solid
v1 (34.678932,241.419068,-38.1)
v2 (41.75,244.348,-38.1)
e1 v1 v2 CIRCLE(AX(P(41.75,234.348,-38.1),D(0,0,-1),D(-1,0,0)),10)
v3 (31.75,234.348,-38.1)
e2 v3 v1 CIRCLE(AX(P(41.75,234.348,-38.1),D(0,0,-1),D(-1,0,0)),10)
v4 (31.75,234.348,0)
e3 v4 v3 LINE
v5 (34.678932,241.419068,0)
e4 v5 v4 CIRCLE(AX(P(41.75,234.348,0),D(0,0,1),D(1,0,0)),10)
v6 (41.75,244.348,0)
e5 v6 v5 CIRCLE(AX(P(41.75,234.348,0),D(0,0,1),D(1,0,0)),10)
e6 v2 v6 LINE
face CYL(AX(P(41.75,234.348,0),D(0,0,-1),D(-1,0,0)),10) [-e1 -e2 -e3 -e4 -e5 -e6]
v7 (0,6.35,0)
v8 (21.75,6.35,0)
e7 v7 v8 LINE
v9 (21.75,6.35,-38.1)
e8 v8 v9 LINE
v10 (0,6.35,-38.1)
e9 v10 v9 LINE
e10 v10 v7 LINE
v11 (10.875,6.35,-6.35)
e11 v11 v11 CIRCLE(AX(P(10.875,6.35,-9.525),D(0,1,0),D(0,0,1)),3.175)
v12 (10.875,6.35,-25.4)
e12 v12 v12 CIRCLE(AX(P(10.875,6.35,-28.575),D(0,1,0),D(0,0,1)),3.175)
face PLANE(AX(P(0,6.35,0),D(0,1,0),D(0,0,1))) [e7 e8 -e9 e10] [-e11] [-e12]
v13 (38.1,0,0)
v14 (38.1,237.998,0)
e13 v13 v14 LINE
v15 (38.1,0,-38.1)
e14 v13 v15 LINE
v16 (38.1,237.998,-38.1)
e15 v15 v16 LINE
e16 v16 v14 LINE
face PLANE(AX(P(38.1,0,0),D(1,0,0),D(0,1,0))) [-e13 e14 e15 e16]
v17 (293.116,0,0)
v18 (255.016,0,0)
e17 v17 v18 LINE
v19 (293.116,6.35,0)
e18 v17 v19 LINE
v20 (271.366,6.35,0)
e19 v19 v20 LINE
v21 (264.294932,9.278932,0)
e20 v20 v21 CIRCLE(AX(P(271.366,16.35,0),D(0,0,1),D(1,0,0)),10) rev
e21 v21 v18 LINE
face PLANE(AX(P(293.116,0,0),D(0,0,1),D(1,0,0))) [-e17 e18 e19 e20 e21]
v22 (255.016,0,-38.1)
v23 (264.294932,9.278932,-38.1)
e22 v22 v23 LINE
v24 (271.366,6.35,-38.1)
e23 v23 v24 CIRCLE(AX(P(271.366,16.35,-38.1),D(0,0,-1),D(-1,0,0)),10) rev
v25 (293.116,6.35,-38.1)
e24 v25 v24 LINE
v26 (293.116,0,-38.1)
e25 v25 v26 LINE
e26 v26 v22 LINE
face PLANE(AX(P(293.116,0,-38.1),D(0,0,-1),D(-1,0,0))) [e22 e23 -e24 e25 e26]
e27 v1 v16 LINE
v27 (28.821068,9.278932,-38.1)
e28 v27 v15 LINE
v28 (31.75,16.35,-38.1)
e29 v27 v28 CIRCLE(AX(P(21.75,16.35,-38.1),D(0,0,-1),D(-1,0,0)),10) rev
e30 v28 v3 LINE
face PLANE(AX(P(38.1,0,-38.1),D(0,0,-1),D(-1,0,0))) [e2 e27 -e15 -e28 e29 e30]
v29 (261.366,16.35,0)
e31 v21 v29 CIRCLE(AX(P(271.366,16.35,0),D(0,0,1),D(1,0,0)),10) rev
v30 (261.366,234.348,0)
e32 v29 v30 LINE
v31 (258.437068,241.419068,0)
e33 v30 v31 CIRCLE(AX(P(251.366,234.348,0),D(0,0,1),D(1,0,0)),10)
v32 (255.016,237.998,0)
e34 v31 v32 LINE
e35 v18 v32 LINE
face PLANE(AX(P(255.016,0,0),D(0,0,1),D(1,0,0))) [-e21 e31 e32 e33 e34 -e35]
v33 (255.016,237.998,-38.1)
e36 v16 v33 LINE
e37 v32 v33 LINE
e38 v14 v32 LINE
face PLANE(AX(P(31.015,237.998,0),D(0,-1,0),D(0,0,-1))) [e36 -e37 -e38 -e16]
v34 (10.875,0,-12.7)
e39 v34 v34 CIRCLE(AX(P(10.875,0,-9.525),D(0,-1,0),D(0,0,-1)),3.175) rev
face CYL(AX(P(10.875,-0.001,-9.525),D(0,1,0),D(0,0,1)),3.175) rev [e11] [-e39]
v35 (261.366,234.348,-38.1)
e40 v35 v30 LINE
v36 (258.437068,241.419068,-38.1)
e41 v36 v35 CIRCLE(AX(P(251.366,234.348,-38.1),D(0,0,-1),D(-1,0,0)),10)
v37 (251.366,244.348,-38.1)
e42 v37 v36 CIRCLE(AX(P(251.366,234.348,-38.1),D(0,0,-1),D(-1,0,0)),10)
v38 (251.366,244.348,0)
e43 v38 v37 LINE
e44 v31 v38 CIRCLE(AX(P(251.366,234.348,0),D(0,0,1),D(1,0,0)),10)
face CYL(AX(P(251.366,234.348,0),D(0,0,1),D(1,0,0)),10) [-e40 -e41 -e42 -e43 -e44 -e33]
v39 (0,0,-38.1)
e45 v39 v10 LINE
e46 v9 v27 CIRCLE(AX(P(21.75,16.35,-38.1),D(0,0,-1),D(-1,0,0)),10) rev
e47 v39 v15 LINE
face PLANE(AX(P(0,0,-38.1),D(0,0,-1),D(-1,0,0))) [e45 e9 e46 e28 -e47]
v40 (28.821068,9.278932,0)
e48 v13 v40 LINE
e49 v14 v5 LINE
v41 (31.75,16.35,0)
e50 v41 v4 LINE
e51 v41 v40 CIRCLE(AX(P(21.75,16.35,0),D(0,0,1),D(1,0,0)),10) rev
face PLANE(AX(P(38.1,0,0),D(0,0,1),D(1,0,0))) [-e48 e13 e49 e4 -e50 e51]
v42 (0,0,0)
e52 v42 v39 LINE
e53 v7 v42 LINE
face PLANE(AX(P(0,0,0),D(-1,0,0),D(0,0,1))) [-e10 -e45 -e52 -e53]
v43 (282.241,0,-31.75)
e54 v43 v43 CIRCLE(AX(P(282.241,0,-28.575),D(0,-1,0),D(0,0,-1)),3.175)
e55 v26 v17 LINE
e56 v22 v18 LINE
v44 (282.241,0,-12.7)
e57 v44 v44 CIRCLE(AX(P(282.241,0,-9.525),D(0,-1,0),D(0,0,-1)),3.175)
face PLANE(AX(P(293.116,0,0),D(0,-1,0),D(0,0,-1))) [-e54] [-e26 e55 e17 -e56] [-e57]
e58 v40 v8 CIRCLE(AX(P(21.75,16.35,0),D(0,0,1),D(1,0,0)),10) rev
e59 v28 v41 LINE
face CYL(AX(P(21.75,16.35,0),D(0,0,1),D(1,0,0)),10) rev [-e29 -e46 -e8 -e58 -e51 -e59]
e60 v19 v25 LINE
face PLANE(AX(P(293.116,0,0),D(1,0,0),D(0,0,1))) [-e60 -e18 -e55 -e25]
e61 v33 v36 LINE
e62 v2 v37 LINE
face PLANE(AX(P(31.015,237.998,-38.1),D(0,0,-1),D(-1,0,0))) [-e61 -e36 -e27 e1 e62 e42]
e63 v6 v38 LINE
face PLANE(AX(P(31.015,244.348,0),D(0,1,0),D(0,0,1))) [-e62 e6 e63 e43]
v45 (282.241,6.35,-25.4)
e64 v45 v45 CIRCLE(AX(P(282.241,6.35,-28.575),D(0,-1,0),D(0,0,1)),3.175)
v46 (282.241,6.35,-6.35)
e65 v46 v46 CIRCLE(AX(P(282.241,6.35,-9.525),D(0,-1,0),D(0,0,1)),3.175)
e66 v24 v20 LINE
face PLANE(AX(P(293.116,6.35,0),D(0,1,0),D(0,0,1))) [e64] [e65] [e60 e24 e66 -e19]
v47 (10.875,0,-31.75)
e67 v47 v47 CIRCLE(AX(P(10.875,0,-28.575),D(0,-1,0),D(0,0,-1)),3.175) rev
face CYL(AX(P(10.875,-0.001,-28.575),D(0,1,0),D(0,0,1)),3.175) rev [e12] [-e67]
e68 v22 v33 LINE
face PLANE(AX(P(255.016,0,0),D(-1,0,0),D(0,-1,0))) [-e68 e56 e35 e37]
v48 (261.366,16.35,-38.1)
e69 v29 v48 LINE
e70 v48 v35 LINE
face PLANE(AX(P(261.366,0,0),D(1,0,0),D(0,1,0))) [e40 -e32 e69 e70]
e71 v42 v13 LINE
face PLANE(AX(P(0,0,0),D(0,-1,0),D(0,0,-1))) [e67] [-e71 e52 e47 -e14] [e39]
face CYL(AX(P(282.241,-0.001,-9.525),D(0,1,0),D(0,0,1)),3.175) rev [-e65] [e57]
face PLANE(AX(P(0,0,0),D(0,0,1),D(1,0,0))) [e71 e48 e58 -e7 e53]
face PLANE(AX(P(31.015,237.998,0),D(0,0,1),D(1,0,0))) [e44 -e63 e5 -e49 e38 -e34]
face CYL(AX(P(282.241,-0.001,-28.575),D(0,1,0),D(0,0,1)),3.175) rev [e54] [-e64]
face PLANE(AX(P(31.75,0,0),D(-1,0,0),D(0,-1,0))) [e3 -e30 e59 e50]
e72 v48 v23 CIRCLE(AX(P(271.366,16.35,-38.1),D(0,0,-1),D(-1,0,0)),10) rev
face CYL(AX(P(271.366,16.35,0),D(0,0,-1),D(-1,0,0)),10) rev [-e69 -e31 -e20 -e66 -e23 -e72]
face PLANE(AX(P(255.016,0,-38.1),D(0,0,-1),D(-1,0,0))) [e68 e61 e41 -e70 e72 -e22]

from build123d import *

# Parameters (mm, degrees)
SKETCH2_W            = 38.1
SKETCH2_H            = 6.35
FILLET1_R            = 10
CUT_EXTRUDE1_REACH   = 284.088
SKETCH3_R            = 3.175
FILLET1_OF_MIRROR1_R = 10


with BuildPart() as part:
    # Sweep1: sweep along a path in Sketch1
    with BuildLine(Plane.XY) as sweep1_path:
        Line((0, 0), (38.1, 0))
        Line((38.1, 0), (38.1, 237.998))
        Line((38.1, 237.998), (146.558, 237.998))
    # Sketch2 → Sweep1 (sweep)
    with BuildSketch(Plane(origin=(0, 0, 0), x_dir=(0, 0, -1), z_dir=(1, 0, 0))):
        with Locations((19.05, 3.175)):
            Rectangle(SKETCH2_W, SKETCH2_H)
    sweep1 = sweep(path=sweep1_path.line, transition=Transition.RIGHT)

    # Fillet1
    fillet1_edges = [part.edges().sort_by_distance(p)[0] for p in [
        (31.75, 6.35, -19.05),
        (31.75, 244.348, -19.05),
    ]]
    fillet(fillet1_edges, radius=FILLET1_R)

    # Sketch3 → Cut-Extrude1 (cut, up to next)
    with BuildSketch(Plane(origin=(0, 6.35, 0), x_dir=(1, 0, 0), z_dir=(0, 1, 0)), mode=Mode.PRIVATE) as cut_extrude1_sk1:
        with Locations((10.875, 28.575)):
            Circle(SKETCH3_R)
    cut_extrude1_tool1 = extrude(cut_extrude1_sk1.sketch, amount=-CUT_EXTRUDE1_REACH, mode=Mode.PRIVATE) & part.part
    # Sketch3 → Cut-Extrude1 (cut, up to next)
    with BuildSketch(Plane(origin=(0, 6.35, 0), x_dir=(1, 0, 0), z_dir=(0, 1, 0)), mode=Mode.PRIVATE) as cut_extrude1_sk2:
        with Locations((10.875, 9.525)):
            Circle(SKETCH3_R)
    cut_extrude1_tool2 = extrude(cut_extrude1_sk2.sketch, amount=-CUT_EXTRUDE1_REACH, mode=Mode.PRIVATE) & part.part
    cut_extrude1_1 = cut_extrude1_tool1.solids().sort_by_distance((10.875, 6.35, -28.575))[0]
    add(cut_extrude1_1, mode=Mode.SUBTRACT)
    cut_extrude1_2 = cut_extrude1_tool2.solids().sort_by_distance((10.875, 6.35, -9.525))[0]
    add(cut_extrude1_2, mode=Mode.SUBTRACT)
    cut_extrude1 = cut_extrude1_1 + cut_extrude1_2  # Cut-Extrude1 as one shape, for the pattern or mirror that repeats it

    # Mirror1: Sweep1, Cut-Extrude1 across plane
    add(sweep1.mirror(Plane(origin=(146.558, 237.998, 0), x_dir=(0, 0, 1), z_dir=(-1, 0, 0))))
    add(cut_extrude1.mirror(Plane(origin=(146.558, 237.998, 0), x_dir=(0, 0, 1), z_dir=(-1, 0, 0))), mode=Mode.SUBTRACT)

    # Fillet1 of Mirror1
    fillet1_of_mirror1_edges = [part.edges().sort_by_distance(p)[0] for p in [
        (261.366, 6.35, -19.05),
        (261.366, 244.348, -19.05),
    ]]
    fillet(fillet1_of_mirror1_edges, radius=FILLET1_OF_MIRROR1_R)


solid = part.part
